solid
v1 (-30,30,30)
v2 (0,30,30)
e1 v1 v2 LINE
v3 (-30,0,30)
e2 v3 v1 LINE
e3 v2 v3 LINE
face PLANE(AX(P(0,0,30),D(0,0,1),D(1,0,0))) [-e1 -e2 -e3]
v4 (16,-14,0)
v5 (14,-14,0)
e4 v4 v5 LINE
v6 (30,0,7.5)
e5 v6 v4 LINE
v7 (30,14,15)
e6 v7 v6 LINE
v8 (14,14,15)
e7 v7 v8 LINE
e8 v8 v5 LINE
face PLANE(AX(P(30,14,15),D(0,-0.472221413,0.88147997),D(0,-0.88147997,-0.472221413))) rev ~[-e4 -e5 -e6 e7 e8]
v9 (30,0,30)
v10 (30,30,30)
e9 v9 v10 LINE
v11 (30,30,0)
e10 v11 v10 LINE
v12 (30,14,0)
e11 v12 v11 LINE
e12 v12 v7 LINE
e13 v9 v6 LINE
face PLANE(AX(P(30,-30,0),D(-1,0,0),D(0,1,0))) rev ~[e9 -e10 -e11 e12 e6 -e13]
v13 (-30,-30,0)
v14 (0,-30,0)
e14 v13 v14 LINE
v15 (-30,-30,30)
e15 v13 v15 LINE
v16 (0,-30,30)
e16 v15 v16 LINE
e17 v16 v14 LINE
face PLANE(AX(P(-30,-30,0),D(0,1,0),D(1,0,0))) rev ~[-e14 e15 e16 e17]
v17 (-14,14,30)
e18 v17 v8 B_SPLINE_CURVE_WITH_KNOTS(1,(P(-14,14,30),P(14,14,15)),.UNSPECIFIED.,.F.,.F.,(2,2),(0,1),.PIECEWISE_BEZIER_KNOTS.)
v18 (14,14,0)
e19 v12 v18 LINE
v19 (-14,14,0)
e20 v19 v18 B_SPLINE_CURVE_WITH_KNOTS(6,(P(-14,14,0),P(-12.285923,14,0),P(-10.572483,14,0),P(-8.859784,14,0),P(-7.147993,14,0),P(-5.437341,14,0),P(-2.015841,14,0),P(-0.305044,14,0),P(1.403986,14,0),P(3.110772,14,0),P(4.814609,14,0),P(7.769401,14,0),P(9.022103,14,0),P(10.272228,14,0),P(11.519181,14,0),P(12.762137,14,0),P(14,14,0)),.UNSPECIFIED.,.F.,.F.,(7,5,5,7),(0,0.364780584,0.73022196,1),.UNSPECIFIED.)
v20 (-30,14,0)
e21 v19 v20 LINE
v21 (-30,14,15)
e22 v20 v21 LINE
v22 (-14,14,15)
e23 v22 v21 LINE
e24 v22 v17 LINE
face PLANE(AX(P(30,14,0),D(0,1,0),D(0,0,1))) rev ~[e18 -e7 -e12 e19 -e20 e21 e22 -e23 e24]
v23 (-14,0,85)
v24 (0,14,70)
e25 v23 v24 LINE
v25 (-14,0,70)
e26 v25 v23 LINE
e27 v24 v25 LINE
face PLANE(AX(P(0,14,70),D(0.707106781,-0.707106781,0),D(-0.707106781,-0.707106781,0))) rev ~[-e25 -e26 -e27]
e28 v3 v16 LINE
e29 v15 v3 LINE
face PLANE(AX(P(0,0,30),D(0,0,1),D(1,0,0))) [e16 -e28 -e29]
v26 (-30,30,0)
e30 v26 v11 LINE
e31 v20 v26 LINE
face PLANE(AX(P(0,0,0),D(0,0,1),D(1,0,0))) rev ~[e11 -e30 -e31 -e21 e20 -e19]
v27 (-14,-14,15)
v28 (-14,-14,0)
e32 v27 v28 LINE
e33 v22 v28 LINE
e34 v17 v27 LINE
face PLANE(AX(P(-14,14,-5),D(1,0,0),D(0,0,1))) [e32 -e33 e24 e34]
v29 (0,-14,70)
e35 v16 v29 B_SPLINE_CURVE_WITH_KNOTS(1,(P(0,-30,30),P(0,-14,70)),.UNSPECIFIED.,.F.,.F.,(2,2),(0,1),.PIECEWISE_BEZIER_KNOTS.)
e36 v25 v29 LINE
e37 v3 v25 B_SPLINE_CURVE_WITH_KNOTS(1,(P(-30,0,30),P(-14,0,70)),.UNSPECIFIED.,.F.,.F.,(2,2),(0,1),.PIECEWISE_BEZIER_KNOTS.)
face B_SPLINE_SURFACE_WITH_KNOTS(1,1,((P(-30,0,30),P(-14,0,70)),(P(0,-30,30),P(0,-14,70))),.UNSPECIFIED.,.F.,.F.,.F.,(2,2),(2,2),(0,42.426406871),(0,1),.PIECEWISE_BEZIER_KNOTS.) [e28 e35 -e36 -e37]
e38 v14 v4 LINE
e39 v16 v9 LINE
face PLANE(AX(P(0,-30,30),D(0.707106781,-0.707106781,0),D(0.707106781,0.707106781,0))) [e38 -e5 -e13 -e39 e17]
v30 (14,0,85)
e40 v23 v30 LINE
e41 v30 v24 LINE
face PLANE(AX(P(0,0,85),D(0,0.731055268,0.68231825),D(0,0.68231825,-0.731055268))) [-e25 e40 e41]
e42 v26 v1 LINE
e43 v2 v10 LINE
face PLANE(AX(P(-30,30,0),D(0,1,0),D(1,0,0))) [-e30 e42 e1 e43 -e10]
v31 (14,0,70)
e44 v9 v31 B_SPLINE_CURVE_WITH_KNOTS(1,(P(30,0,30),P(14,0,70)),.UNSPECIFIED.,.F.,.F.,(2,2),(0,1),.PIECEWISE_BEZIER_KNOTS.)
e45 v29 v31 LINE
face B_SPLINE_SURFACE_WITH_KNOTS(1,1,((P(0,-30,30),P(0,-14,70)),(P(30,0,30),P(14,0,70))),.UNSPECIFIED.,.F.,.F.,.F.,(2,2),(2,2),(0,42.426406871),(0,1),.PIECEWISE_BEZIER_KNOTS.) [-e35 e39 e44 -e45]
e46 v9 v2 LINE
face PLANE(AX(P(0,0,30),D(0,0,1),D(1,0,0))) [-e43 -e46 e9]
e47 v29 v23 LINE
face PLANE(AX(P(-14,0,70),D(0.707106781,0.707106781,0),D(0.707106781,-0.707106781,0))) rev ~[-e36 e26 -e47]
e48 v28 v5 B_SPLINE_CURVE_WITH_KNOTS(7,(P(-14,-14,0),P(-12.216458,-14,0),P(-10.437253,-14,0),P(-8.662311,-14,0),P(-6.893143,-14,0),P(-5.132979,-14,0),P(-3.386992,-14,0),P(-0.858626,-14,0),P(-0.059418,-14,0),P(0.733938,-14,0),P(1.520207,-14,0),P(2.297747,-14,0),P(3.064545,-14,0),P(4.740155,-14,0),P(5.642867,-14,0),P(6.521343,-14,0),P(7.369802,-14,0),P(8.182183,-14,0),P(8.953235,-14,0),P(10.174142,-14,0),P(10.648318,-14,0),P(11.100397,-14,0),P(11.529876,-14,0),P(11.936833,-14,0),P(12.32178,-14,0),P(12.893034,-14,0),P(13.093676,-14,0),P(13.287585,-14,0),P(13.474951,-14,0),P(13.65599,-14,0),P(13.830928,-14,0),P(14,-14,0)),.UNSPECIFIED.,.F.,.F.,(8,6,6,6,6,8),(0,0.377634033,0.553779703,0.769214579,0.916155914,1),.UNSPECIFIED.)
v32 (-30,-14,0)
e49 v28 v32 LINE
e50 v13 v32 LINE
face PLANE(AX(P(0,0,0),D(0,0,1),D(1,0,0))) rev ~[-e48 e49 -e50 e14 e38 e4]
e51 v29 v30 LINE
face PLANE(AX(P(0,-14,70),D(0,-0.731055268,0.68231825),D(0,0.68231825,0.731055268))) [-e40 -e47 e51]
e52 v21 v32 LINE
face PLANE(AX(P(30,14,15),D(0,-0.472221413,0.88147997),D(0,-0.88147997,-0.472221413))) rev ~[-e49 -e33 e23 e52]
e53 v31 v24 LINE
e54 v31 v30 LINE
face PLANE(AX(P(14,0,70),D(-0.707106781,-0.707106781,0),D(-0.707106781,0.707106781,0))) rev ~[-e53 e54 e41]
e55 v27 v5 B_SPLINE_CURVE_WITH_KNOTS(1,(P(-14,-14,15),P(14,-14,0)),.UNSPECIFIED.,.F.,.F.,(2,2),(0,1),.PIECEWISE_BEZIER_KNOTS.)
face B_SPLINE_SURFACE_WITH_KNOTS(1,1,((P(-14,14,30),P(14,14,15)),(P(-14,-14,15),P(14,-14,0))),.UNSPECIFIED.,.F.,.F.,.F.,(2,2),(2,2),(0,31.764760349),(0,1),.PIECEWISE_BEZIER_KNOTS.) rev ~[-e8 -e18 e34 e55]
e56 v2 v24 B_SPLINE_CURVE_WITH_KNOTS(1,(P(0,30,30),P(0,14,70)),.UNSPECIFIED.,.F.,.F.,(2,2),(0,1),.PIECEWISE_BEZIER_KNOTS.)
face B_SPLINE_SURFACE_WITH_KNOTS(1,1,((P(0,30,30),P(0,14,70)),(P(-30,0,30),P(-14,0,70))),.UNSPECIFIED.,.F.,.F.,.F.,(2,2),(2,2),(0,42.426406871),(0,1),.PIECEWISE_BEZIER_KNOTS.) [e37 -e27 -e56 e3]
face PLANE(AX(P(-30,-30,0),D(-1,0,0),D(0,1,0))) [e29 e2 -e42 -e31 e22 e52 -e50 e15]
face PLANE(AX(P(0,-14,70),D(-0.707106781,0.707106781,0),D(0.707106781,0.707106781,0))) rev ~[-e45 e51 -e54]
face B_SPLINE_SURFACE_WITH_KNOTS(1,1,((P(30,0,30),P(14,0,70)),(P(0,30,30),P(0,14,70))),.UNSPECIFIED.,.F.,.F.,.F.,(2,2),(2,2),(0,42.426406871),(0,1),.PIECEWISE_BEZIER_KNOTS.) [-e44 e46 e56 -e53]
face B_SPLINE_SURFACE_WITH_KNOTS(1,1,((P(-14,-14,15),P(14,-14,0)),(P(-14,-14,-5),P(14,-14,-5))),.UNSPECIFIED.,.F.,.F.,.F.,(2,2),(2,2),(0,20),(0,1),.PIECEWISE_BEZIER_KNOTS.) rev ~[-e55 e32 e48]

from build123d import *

# Parameters (mm, degrees)
F0_W          = 60
F0_H          = 60
F1_DEPTH      = 30
F6_DEPTH      = 15
F8_DEPTH      = 14.001
F8_DEPTH_BACK = 14.001
F9_DEPTH      = 30.001
F19_DEPTH     = 60


with BuildPart() as f1:
    # F0 (on Top) → F1 (new body)
    with BuildSketch(Plane.XY):
        Rectangle(F0_W, F0_H)
    extrude(amount=F1_DEPTH)

    # F2 (on face) → F5 section 0
    with BuildSketch(Plane.XY.offset(30)):
        Polygon((30, 0), (0, 30), (-30, 0), (0, -30), align=None)
    # F4 (on offset) → F5 section 1
    with BuildSketch(Plane.XY.offset(70)):
        Polygon((14, 0), (0, 14), (-14, 0), (0, -14), align=None)
    loft()

    # F6 (add): a face of the model
    f6_faces = [f1.faces().sort_by_distance(p)[0] for p in [
        (0, 0, 70),
    ]]
    extrude(f6_faces, amount=F6_DEPTH)

    # F7 (on Right) → F8 (cut, two sides)
    with BuildSketch(Plane.YZ) as f8_sk:
        Polygon((14, 85), (0, 85), (14, 70), align=None)
        Polygon((0, 85), (-14, 85), (-14, 70), align=None)
    extrude(amount=-F8_DEPTH, mode=Mode.SUBTRACT)
    extrude(f8_sk.sketch, amount=F8_DEPTH_BACK, mode=Mode.SUBTRACT)

    # F9 (cut, through all): a face of the model
    f9_faces = [f1.faces().sort_by_distance(p)[0] for p in [
        (20, -20, 30),
    ]]
    extrude(f9_faces, amount=-F9_DEPTH, mode=Mode.SUBTRACT)

    # F13 (on offset) → F17 section 0
    with BuildSketch(Plane.YZ.offset(-14)):
        Polygon((14, -5), (14, 0), (14, 30), (-14, 15), (-14, 0), (-14, -5), align=None)
    # F11 (on offset) → F17 section 1
    with BuildSketch(Plane.YZ.offset(14)):
        Polygon((14, 15), (-14, 0), (-14, -5), (14, -5), (14, 0), align=None)
    loft(mode=Mode.SUBTRACT)

    # F18 (on face) → F19 (cut, through all)
    with BuildSketch(Plane.YZ.offset(30)):
        Polygon((14, 0), (14, 15), (0, 7.5), (0, 0), align=None)
        Polygon((0, 0), (0, 7.5), (-14, 0), align=None)
    extrude(amount=-F19_DEPTH, mode=Mode.SUBTRACT)


solid = f1.part
